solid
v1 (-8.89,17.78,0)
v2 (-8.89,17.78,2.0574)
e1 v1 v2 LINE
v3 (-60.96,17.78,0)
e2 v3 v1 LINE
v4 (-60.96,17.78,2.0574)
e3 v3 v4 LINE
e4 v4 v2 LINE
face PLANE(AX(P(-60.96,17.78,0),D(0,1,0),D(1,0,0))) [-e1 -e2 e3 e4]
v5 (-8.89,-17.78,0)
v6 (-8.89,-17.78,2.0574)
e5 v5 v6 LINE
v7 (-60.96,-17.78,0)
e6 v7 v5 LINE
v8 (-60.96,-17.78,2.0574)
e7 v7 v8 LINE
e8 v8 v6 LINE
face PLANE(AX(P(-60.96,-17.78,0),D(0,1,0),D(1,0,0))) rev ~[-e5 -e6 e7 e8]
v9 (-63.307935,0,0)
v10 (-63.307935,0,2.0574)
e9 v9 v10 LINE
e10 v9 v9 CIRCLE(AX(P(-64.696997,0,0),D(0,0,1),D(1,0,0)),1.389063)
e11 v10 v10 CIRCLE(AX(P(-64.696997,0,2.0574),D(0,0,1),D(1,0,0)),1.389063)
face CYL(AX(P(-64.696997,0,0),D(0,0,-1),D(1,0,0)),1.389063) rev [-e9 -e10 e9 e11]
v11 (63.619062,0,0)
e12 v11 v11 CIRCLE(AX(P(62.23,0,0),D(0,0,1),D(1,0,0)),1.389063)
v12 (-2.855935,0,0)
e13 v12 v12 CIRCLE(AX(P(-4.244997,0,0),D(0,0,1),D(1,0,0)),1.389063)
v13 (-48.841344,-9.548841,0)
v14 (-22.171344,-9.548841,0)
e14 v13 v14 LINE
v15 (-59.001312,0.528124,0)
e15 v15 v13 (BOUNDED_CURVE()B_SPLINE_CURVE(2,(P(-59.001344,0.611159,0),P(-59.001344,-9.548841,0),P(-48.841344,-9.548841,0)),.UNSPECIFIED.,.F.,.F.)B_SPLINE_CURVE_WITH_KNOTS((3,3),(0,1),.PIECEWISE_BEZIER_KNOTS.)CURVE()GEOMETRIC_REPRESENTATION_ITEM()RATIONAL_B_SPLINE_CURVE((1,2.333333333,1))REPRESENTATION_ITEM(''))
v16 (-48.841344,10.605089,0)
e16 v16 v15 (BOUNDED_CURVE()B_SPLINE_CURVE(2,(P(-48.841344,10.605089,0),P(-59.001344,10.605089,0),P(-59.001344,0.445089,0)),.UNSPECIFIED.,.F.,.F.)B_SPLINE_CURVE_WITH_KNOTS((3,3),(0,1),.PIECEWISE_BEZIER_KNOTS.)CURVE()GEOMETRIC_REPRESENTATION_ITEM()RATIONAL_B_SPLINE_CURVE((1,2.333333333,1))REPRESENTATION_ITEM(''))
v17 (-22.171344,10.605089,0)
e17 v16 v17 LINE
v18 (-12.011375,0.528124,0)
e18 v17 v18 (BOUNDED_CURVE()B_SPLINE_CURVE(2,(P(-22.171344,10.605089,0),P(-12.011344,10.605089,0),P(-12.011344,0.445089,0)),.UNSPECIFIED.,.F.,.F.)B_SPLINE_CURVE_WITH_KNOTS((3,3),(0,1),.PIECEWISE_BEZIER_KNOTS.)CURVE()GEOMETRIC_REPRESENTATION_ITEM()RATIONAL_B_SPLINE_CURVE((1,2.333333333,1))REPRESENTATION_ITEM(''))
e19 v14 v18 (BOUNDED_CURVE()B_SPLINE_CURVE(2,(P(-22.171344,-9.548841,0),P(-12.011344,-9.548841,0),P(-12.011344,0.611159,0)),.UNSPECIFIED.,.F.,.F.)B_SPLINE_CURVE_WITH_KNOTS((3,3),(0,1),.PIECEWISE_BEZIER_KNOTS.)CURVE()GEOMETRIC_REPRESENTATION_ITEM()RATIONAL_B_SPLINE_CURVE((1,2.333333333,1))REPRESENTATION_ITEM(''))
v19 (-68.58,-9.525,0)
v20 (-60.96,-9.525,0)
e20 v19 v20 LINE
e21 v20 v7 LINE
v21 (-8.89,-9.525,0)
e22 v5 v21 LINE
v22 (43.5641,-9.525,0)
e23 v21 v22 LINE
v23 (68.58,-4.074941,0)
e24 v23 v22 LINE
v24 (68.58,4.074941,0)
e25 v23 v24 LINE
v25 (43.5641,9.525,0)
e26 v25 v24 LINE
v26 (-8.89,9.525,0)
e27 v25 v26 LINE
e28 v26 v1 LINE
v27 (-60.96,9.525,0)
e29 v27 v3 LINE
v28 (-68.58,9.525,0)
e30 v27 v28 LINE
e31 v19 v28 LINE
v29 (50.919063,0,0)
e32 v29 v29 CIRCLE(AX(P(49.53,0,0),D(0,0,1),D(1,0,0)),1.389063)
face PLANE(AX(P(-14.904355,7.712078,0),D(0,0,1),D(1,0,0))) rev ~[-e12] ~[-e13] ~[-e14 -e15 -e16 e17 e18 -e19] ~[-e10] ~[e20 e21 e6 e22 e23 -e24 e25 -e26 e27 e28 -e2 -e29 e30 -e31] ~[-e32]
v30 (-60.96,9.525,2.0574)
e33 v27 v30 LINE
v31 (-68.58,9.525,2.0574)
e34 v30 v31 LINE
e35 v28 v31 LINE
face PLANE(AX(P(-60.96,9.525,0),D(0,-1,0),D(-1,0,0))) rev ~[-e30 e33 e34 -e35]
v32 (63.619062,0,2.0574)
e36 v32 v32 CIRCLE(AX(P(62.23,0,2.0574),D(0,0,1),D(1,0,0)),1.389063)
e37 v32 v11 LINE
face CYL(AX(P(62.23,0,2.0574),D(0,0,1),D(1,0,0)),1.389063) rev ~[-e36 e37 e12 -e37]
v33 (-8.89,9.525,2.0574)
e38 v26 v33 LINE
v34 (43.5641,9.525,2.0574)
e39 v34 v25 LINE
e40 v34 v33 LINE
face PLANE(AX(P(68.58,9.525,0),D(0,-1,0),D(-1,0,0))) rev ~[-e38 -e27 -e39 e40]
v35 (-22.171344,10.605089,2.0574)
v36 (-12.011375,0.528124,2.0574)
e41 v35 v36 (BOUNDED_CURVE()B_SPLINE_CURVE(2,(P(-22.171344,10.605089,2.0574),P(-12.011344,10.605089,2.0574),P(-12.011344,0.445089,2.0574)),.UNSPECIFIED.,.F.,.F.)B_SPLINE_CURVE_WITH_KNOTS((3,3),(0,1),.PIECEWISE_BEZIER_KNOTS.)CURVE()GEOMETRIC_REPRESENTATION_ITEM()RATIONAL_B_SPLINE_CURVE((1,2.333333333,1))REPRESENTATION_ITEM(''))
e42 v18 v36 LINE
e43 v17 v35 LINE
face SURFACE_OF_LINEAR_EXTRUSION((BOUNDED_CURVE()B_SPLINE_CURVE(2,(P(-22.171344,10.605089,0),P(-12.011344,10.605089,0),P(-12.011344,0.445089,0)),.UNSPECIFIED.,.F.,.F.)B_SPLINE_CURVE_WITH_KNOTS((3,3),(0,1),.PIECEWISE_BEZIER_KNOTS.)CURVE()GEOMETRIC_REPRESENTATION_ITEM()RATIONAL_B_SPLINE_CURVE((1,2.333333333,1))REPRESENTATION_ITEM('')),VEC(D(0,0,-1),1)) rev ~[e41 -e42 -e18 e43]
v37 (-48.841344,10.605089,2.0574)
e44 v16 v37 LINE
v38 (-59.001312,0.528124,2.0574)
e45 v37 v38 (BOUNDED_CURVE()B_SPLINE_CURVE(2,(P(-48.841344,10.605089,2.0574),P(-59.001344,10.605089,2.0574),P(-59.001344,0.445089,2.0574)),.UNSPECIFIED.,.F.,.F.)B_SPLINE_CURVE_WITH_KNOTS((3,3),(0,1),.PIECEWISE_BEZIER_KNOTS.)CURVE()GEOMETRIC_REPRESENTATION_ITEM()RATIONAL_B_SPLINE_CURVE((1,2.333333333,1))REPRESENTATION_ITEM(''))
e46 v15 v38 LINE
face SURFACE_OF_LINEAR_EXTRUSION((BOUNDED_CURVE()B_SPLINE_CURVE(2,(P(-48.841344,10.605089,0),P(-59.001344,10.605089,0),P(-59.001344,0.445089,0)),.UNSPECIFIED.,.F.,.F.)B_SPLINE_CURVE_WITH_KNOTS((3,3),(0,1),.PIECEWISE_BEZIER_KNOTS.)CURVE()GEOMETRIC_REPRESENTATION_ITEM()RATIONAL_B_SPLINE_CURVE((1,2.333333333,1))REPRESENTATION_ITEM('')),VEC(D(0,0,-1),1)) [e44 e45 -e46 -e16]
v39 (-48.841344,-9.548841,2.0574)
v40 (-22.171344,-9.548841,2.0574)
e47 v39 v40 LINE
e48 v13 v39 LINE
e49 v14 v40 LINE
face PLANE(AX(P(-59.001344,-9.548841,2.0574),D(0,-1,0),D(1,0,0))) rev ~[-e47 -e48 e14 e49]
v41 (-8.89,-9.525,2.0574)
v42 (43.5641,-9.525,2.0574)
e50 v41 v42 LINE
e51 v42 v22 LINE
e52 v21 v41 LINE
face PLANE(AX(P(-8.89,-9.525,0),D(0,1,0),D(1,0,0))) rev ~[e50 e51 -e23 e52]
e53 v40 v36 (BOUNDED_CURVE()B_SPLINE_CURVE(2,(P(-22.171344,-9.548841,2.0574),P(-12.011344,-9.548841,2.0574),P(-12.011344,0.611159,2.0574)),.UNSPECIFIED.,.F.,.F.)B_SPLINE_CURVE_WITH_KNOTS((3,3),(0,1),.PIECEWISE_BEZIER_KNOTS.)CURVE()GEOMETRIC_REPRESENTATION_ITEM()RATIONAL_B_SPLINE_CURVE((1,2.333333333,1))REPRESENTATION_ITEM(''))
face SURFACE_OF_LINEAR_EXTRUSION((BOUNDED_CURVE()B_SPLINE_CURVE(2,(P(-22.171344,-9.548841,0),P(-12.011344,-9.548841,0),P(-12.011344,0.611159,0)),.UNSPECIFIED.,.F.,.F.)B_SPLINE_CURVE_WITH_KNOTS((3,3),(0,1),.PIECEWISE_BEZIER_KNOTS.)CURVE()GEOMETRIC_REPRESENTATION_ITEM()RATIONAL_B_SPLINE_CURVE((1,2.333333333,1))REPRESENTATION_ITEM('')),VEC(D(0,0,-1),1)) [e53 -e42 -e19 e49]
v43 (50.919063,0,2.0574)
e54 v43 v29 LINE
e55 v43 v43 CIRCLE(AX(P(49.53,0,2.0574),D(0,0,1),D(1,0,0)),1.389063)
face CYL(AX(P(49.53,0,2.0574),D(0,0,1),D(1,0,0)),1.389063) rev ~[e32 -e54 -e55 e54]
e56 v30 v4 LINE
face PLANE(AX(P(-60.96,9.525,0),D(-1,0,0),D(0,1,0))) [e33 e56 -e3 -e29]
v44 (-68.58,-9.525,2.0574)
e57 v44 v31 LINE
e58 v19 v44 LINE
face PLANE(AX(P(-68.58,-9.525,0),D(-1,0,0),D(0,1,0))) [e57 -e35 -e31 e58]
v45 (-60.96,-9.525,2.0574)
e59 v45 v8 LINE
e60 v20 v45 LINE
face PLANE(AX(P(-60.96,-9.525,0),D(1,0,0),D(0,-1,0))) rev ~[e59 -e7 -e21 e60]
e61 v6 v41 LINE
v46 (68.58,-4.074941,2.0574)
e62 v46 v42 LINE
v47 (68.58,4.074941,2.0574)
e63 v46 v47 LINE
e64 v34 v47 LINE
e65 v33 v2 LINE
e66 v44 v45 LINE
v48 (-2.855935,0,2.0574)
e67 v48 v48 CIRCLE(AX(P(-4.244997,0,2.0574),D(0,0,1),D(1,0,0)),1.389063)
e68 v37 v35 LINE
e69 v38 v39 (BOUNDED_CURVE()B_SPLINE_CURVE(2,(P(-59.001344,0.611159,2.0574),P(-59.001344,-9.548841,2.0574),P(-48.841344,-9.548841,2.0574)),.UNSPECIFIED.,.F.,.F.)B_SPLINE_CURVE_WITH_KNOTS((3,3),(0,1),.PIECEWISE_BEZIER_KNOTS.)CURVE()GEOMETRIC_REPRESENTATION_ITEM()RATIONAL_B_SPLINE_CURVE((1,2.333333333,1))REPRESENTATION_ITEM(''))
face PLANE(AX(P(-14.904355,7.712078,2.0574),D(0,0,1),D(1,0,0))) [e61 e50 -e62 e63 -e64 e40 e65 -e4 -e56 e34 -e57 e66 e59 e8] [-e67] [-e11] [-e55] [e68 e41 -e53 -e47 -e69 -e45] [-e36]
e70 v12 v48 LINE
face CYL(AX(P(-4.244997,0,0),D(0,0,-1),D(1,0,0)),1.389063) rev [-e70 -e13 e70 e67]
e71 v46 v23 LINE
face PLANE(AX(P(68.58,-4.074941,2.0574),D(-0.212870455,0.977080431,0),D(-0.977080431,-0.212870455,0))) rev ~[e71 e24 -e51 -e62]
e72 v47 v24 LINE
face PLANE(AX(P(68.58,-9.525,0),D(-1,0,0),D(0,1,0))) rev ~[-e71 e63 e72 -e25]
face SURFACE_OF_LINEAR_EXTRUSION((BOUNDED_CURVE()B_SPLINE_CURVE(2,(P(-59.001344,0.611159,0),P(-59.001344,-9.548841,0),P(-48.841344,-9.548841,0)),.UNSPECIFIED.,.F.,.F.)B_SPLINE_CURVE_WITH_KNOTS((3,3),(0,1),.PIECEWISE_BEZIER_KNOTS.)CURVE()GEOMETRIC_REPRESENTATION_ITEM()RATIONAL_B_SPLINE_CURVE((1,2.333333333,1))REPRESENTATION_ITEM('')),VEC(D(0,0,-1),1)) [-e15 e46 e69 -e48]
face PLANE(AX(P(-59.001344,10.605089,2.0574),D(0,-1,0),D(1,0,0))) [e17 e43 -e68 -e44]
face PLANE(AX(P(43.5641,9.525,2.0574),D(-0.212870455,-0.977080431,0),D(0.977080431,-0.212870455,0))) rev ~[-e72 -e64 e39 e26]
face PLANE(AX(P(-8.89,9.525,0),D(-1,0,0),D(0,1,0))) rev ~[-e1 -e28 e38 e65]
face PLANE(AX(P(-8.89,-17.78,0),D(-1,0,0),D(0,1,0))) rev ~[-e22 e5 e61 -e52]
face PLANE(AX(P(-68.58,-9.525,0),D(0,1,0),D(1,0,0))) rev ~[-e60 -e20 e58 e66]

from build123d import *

# Parameters (mm, degrees)
F0_W        = 77.47
F0_H        = 19.05
F0_R        = 1.3890625
F0_W_2      = 52.07
F0_H_2      = 8.255
F0_W_3      = 7.62
F1_DEPTH    = 2.0574
F2_R        = 1.3890625
F2_W        = 46.99
F2_H        = 20.1539304107
F3_DEPTH    = 25.4
F4_T1_DEPTH = 2.0574


# Not quite as in the source:
# - a fillet or chamfer that OpenCascade refuses, or shapes differently, is made with other operations: its cross-section is extruded or revolved along the edge and cut away or added


with BuildPart() as f1:
    # F0 (on Top) → F1 (new body)
    with BuildSketch(Plane.XY):
        with Locations((29.845, 0)):
            Rectangle(F0_W, F0_H)
        with Locations((-4.2449974041, 0)):
            Circle(F0_R, mode=Mode.SUBTRACT)
        with Locations((-34.925, -13.6525)):
            Rectangle(F0_W_2, F0_H_2)
        with Locations((-34.925, 0)):
            Rectangle(F0_W_2, F0_H)
        with Locations((-64.77, 0)):
            Rectangle(F0_W_3, F0_H)
        with Locations((-64.6969974041, 0)):
            Circle(F0_R, mode=Mode.SUBTRACT)
        with Locations((-34.925, 13.6525)):
            Rectangle(F0_W_2, F0_H_2)
    extrude(amount=F1_DEPTH)

    # F2 (on face) → F3 (cut)
    with BuildSketch(Plane.XY.offset(2.0574)):
        Polygon((43.5640997417, 9.525), (68.58, 4.0749409236), (68.58, 9.525), align=None)
        Polygon((68.58, -9.525), (68.58, -4.0749409236), (43.5640997417, -9.525), align=None)
        with Locations((49.53, 0)):
            Circle(F2_R)
        with Locations((62.23, 0)):
            Circle(F2_R)
        with Locations((-35.5063436133, 0.5281241611)):
            Rectangle(F2_W, F2_H)
    extrude(amount=-F3_DEPTH, mode=Mode.SUBTRACT)

    # F4: fillet of radius 10.16 on 4 edges, made by hand

    # F4_s2 → F4_t1 (join)
    with BuildSketch(Plane.XY):
        with BuildLine():
            add(Edge.make_bspline(
                [(-22.1713436133, 10.6050893664), (-12.0113436133, 10.6050893664), (-12.0113436133, 0.4450893664)],
                knots=[0, 0, 0, 1, 1, 1], degree=2, weights=[1, 2.3333333333, 1]))
            Line((-12.0113436133, 0.4450893664), (-12.0113436133, 10.6050893664))
            Line((-12.0113436133, 10.6050893664), (-22.1713436133, 10.6050893664))
        make_face()
        with BuildLine():
            add(Edge.make_bspline(
                [(-48.8413436133, 10.6050893664), (-59.0013436133, 10.6050893664), (-59.0013436133, 0.4450893664)],
                knots=[0, 0, 0, 1, 1, 1], degree=2, weights=[1, 2.3333333333, 1]))
            Line((-59.0013436133, 0.4450893664), (-59.0013436133, 10.6050893664))
            Line((-59.0013436133, 10.6050893664), (-48.8413436133, 10.6050893664))
        make_face()
        with BuildLine():
            add(Edge.make_bspline(
                [(-59.0013436133, 0.6111589557), (-59.0013436133, -9.5488410443), (-48.8413436133, -9.5488410443)],
                knots=[0, 0, 0, 1, 1, 1], degree=2, weights=[1, 2.3333333333, 1]))
            Line((-48.8413436133, -9.5488410443), (-59.0013436133, -9.5488410443))
            Line((-59.0013436133, -9.5488410443), (-59.0013436133, 0.6111589557))
        make_face()
        with BuildLine():
            add(Edge.make_bspline(
                [(-22.1713436133, -9.5488410443), (-12.0113436133, -9.5488410443), (-12.0113436133, 0.6111589557)],
                knots=[0, 0, 0, 1, 1, 1], degree=2, weights=[1, 2.3333333333, 1]))
            Line((-12.0113436133, 0.6111589557), (-12.0113436133, -9.5488410443))
            Line((-12.0113436133, -9.5488410443), (-22.1713436133, -9.5488410443))
        make_face()
    extrude(amount=F4_T1_DEPTH)


solid = f1.part
